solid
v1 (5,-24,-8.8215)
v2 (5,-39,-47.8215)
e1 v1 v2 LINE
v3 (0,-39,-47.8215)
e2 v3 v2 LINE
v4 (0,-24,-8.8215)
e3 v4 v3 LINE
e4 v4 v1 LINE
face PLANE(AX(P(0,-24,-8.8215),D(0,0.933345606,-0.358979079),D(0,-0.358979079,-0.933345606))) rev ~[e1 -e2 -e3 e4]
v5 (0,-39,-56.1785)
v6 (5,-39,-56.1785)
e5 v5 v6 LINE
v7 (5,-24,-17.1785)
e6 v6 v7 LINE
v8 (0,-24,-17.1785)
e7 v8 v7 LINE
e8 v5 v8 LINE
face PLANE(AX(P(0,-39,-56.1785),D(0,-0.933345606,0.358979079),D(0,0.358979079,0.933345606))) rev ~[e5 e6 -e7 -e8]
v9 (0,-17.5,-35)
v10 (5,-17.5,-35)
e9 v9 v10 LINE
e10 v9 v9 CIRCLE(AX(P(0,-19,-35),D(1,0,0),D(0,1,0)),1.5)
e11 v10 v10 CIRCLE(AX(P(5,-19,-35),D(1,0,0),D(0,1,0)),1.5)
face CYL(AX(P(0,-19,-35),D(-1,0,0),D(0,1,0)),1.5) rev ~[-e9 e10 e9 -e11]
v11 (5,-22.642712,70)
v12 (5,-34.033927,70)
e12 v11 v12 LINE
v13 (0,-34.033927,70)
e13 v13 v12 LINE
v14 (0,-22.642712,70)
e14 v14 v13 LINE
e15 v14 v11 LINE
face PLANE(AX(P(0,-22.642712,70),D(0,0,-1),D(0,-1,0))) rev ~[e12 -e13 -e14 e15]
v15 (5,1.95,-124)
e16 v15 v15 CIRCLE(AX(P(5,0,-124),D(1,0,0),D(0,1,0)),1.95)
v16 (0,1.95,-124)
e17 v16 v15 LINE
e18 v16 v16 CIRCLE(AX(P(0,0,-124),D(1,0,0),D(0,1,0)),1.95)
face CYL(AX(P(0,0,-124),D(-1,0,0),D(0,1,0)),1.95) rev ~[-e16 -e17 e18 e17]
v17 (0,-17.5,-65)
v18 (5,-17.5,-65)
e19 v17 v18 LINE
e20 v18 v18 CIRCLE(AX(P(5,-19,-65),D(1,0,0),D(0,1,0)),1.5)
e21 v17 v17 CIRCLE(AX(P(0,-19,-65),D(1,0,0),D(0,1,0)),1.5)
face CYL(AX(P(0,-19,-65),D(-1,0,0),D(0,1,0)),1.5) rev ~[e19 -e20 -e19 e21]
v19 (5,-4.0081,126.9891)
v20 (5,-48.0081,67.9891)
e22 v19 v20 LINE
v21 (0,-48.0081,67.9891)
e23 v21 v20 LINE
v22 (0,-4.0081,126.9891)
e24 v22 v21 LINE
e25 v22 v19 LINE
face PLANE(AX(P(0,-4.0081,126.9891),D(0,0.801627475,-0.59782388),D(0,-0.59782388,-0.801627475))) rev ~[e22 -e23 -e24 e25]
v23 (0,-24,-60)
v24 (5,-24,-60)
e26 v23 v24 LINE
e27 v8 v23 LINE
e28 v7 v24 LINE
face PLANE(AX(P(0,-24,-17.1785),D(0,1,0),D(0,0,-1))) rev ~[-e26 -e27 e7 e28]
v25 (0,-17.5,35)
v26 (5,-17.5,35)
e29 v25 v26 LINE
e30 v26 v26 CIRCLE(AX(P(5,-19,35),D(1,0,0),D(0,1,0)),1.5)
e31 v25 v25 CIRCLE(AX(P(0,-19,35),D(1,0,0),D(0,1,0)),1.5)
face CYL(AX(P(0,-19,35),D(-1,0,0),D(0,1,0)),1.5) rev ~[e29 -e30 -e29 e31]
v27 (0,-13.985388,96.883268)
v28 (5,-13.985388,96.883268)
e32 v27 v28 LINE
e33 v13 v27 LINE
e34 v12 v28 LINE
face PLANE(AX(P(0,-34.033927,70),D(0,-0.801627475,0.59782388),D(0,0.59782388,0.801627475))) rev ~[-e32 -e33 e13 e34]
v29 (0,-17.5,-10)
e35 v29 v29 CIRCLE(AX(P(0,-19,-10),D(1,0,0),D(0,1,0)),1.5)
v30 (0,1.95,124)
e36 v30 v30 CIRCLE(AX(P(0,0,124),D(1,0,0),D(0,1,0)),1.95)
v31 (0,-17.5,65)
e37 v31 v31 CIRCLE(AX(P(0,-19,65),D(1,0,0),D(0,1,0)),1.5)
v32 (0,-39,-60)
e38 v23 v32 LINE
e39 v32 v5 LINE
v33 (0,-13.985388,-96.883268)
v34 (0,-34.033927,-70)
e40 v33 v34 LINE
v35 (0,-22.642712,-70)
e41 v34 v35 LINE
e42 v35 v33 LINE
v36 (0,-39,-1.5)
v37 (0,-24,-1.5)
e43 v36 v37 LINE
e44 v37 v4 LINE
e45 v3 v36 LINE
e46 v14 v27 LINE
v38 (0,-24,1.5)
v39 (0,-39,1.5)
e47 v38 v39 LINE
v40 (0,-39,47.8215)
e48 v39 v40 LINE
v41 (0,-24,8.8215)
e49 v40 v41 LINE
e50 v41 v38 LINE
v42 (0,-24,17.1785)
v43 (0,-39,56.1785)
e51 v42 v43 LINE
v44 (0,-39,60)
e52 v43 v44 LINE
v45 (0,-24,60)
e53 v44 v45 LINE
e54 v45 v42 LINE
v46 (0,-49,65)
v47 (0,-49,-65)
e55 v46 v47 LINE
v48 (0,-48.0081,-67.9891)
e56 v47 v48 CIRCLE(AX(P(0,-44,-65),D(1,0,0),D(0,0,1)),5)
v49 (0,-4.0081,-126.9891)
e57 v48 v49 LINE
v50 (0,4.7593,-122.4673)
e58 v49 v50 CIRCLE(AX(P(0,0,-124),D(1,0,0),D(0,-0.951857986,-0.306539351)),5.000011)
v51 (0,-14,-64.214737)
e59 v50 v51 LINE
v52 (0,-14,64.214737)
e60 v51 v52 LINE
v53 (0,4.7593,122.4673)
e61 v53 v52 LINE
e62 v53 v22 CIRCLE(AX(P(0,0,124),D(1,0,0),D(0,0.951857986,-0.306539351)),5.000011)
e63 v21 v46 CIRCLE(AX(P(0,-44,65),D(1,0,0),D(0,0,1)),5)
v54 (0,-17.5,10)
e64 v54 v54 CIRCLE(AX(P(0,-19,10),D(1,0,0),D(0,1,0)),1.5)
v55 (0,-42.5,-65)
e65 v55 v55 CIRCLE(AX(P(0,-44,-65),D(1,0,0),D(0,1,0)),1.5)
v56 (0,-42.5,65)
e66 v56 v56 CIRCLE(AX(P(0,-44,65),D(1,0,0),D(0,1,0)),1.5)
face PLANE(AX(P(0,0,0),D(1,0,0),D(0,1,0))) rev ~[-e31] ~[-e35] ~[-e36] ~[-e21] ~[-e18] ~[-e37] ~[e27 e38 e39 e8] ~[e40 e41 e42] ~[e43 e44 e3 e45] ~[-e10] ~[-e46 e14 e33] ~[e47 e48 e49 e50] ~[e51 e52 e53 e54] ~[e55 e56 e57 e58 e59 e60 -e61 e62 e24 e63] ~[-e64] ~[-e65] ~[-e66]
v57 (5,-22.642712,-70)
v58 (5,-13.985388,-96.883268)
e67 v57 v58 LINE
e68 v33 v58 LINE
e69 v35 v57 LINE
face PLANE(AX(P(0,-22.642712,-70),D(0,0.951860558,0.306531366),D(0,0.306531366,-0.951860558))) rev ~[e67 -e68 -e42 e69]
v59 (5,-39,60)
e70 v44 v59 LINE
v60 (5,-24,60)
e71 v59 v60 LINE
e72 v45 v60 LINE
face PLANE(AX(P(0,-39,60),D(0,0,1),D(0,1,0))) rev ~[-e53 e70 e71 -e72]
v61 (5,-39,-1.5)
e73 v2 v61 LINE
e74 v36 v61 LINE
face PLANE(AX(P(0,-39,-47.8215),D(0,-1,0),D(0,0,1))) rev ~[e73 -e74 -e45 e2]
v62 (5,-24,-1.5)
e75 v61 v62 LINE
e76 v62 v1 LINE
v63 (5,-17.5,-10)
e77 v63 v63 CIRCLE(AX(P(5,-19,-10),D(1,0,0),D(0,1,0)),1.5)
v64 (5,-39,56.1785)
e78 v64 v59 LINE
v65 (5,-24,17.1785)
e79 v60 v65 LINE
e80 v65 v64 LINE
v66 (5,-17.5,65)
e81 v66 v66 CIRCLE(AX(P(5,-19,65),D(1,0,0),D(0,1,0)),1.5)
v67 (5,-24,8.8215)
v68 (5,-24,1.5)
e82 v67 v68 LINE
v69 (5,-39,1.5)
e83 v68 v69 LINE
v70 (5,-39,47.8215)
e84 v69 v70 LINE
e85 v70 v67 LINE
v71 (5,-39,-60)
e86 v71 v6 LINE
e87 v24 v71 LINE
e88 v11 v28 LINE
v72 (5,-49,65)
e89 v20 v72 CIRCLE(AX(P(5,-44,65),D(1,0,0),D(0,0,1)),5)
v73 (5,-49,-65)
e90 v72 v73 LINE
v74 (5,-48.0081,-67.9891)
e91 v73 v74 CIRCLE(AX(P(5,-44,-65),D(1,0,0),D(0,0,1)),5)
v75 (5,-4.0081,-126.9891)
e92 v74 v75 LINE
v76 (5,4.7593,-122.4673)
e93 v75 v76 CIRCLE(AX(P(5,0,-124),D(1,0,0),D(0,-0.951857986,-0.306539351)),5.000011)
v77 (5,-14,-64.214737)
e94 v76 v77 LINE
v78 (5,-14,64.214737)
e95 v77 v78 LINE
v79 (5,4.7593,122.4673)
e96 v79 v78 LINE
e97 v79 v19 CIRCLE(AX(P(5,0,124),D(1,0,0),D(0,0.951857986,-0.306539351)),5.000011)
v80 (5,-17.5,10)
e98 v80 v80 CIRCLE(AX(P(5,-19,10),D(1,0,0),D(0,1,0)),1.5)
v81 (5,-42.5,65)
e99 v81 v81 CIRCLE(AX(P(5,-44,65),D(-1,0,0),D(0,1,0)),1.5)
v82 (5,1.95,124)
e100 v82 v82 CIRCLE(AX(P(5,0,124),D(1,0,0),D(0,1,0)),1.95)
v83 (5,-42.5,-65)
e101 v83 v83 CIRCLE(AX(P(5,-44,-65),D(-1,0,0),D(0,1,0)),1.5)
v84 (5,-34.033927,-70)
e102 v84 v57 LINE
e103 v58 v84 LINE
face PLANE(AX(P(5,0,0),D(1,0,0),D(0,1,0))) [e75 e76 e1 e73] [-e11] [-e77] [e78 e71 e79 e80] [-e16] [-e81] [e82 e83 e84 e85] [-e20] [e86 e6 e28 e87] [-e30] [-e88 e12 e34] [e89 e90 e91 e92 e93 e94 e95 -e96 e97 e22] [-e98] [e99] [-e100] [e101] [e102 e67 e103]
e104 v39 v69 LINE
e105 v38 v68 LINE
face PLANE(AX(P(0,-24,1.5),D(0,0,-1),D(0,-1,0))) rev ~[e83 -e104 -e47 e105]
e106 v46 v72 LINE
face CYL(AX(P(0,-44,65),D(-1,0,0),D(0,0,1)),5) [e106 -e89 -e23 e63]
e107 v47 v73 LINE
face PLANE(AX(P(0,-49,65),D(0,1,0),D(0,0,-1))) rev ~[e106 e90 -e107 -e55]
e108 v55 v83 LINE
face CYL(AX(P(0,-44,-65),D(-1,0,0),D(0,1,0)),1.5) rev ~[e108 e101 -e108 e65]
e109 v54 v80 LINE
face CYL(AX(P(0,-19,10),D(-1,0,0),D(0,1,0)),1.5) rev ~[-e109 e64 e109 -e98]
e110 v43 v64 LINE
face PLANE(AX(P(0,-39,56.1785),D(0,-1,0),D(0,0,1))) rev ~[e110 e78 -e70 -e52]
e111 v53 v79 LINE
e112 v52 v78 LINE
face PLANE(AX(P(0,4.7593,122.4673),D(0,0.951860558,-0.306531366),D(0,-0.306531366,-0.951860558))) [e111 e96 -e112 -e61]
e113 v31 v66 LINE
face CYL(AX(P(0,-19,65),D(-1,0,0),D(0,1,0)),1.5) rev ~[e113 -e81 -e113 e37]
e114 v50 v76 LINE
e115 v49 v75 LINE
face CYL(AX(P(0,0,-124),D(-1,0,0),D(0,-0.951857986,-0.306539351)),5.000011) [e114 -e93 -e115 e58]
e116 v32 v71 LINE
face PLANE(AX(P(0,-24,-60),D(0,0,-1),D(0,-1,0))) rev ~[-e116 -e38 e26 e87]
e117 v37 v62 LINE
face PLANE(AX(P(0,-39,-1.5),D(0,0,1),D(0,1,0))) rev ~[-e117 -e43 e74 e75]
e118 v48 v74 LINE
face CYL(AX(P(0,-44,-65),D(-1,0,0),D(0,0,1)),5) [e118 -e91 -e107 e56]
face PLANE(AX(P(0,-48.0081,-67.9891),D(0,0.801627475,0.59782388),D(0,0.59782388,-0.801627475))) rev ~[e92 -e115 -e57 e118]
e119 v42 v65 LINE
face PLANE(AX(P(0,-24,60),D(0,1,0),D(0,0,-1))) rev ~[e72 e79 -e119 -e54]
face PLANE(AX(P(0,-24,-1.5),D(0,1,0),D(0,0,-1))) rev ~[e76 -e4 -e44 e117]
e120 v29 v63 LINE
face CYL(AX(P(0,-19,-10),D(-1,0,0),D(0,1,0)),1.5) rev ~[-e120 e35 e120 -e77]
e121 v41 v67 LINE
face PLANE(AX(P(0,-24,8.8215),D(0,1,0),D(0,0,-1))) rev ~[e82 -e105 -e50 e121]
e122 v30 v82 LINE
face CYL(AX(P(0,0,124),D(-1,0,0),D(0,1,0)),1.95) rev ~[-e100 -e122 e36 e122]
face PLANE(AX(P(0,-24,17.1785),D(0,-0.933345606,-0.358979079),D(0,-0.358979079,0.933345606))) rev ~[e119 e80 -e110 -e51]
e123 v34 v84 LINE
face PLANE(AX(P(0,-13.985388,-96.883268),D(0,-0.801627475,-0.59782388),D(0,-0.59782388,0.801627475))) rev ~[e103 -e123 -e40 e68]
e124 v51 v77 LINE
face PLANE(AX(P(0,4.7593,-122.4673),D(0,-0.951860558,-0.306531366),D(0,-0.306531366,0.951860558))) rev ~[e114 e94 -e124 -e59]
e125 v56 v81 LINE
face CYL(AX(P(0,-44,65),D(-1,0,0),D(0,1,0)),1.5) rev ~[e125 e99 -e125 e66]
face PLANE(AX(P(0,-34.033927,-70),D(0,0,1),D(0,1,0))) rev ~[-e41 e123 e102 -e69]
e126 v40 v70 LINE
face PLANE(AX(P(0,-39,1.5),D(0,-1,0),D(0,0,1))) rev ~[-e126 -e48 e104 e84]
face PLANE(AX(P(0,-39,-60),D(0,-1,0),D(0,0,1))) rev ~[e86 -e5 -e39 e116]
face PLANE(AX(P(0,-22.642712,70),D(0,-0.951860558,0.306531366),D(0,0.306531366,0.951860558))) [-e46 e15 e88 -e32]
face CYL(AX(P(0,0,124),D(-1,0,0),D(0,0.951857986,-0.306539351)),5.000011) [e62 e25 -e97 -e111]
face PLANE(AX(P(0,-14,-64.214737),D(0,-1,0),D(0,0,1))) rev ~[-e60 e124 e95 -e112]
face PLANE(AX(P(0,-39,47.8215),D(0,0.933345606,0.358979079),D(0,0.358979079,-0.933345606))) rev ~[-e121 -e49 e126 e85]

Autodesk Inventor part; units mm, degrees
ref_plane "YZ Plane" through (0, 0, 0) normal (1, 0, 0) x (0, 1, 0)
ref_plane "XZ Plane" through (0, 0, 0) normal (0, 1, 0) x (-1, 0, 0)
sketch "Sketch1" plane through (0, 0, 0) normal (1, 0, 0) x (0, 1, 0)
  circle A0 centre (0, -124) radius 1.95
  circle A1 centre (0, 124) radius 1.95
  circle A2 centre (-19, -65) radius 1.5
  circle A3 centre (-19, 65) radius 1.5
  line L0 (0, 124) -> (-19, 65) construction
  line L1 (4.7593, 122.4673) -> (-14.2407, 63.4673)
  line L2 (-23.7593, 66.5327) -> (-4.7593, 125.5327)
  arc A4 (4.7593, 122.4673) -> (-4.7593, 125.5327) centre (0, 124) ccw
  arc A5 (-23.7593, 66.5327) -> (-14.2407, 63.4673) centre (-19, 65) ccw
  line L3 (-19, 65) -> (-19, -65) construction
  line L4 (-24, 65) -> (-24, -65)
  line L5 (-14, -65) -> (-14, 65)
  arc A6 (-14, 65) -> (-24, 65) centre (-19, 65) ccw
  arc A7 (-24, -65) -> (-14, -65) centre (-19, -65) ccw
  line L6 (-19, -65) -> (0, -124) construction
  line L7 (-23.7593, -66.5327) -> (-4.7593, -125.5327)
  line L8 (4.7593, -122.4673) -> (-14.2407, -63.4673)
  arc A8 (-14.2407, -63.4673) -> (-23.7593, -66.5327) centre (-19, -65) ccw
  arc A9 (-4.7593, -125.5327) -> (4.7593, -122.4673) centre (0, -124) ccw
  circle A10 centre (-44, 65) radius 1.5
  circle A11 centre (-44, -65) radius 1.5
  line L9 (-19, 65) -> (-44, 65) construction
  line L10 (-19, 70) -> (-44, 70)
  line L11 (-44, 60) -> (-19, 60)
  arc A12 (-19, 60) -> (-19, 70) centre (-19, 65) ccw
  arc A13 (-44, 70) -> (-44, 60) centre (-44, 65) ccw
  line L12 (-19, -65) -> (-44, -65) construction
  line L13 (-19, -60) -> (-44, -60)
  line L14 (-44, -70) -> (-19, -70)
  arc A14 (-19, -70) -> (-19, -60) centre (-19, -65) ccw
  arc A15 (-44, -60) -> (-44, -70) centre (-44, -65) ccw
  line L15 (0, 124) -> (-44, 65) construction
  line L16 (-4.0081, 126.9891) -> (-48.0081, 67.9891)
  line L17 (-39.9919, 62.0109) -> (4.0081, 121.0109)
  arc A16 (4.0081, 121.0109) -> (-4.0081, 126.9891) centre (0, 124) ccw
  arc A17 (-48.0081, 67.9891) -> (-39.9919, 62.0109) centre (-44, 65) ccw
  line L18 (-44, -65) -> (0, -124) construction
  line L19 (-48.0081, -67.9891) -> (-4.0081, -126.9891)
  line L20 (4.0081, -121.0109) -> (-39.9919, -62.0109)
  arc A18 (-39.9919, -62.0109) -> (-48.0081, -67.9891) centre (-44, -65) ccw
  arc A19 (-4.0081, -126.9891) -> (4.0081, -121.0109) centre (0, -124) ccw
  line L21 (-44, 65) -> (-44, -65) construction
  line L22 (-49, 65) -> (-49, -65)
  line L23 (-39, -65) -> (-39, 65)
  arc A20 (-39, 65) -> (-49, 65) centre (-44, 65) ccw
  arc A21 (-49, -65) -> (-39, -65) centre (-44, -65) ccw
  line L24 (-44, 65) -> (-19, 0) construction
  line L25 (-45.4, 64.4615) -> (-20.4, -0.5385)
  line L26 (-17.6, 0.5385) -> (-42.6, 65.5385)
  arc A22 (-42.6, 65.5385) -> (-45.4, 64.4615) centre (-44, 65) ccw
  arc A23 (-20.4, -0.5385) -> (-17.6, 0.5385) centre (-19, 0) ccw
  line L27 (-44, -65) -> (-19, 0) construction
  line L28 (-42.6, -65.5385) -> (-17.6, -0.5385)
  line L29 (-20.4, 0.5385) -> (-45.4, -64.4615)
  arc A24 (-45.4, -64.4615) -> (-42.6, -65.5385) centre (-44, -65) ccw
  arc A25 (-17.6, -0.5385) -> (-20.4, 0.5385) centre (-19, 0) ccw
  line L30 (-19, 0) -> (-44, 0) construction
  line L31 (-19, 1.5) -> (-44, 1.5)
  line L32 (-44, -1.5) -> (-19, -1.5)
  arc A26 (-19, -1.5) -> (-19, 1.5) centre (-19, 0) ccw
  arc A27 (-44, 1.5) -> (-44, -1.5) centre (-44, 0) ccw
  circle A28 centre (-19, -10) radius 1.5
  circle A29 centre (-19, -35) radius 1.5
  circle A30 centre (-19, 10) radius 1.5
  circle A31 centre (-19, 35) radius 1.5
  point P0 (0, 0)
  point P1 (-9.5, 94.5)
  point P2 (-9.5, -94.5)
  point P3 (-14, -64.2148)
  point P4 (-14, 64.2148)
  point P5 (-24, 65)
  point P6 (-31.5, 65)
  point P7 (-31.5, -65)
  point P8 (-22, 94.5)
  point P9 (-22, -94.5)
  point P10 (-44, 0)
  point P11 (-31.5, 32.5)
  point P12 (-31.5, -32.5)
  point P13 (-39, 47.8215)
  point P14 (-24, 8.8215)
  point P15 (-24, 17.1785)
  point P16 (-40.4698, 60)
  point P17 (-24, 60)
  point P18 (-22.6427, 70)
  point P19 (-34.0339, 70)
  point P20 (-13.9854, 96.8832)
  point P21 (-6.8749, 118.9633)
  point P22 (-43.3898, 70)
  point P23 (-49, 65)
  point P24 (-43.3898, -70)
  point P25 (-6.8749, -118.9633)
  point P26 (-13.9854, -96.8832)
  point P27 (-34.0339, -70)
  point P28 (-22.6427, -70)
  point P29 (-24, -60)
  point P30 (-40.4698, -60)
  point P31 (-24, -17.1785)
  point P32 (-24, -8.8215)
  point P33 (-39, -47.8215)
  point P34 (-31.5, 0)
  point P35 (-39, -1.5)
  point P36 (-24, -1.5)
  point P37 (-24, 1.5)
  point P38 (-39, 1.5)
  point P39 (-49, 65)
  point P40 (-4.0081, -126.9891)
  point P41 (-39, 60)
  point P42 (-39, -60)
  point P43 (-39, -56.1785)
  point P44 (-39, 56.1785)
  dimension "d2" = 3.9
  dimension "d4" = 3.9
  dimension "d25" = 3
  dimension "d28" = 3
  dimension "d43" = 59
  dimension "d44" = 65
  dimension "d45" = 65
  dimension "d47" = 59
  dimension "d48" = 10
  dimension "d49" = 10
  dimension "d50" = 10
  dimension "d52" = 14
  dimension "d53" = 3
  dimension "d54" = 3
  dimension "d55" = 10
  dimension "d56" = 10
  dimension "d57" = 25
  dimension "d58" = 25
  dimension "d59" = 10
  dimension "d60" = 10
  dimension "d61" = 10
  dimension "d62" = 3
  dimension "d63" = 3
  dimension "d64" = 3
  dimension "d65" = 3
  dimension "d66" = 3
  dimension "d67" = 10
  dimension "d68" = 25
  dimension "d69" = 3
  dimension "d70" = 3
  dimension "d71" = 10
  dimension "d72" = 25
extrude "Extrusion1" add sketch "Sketch1" along normal blind 5 contours A16 L17 L2 A4 | L1 L5 A6 L10 L2 L17 A16 | L5 L8 A8 L13 L4 L28 A23 L26 L11 A5 L1 | L1 A12 L5 | A4 L2 L17 L10 A13 L16 | A5 A6 A12 | L8 A19 L20 L7 L14 A7 L5 | L5 A14 L8 | A13 A20 L23 L17 A17 L26 A10 L25 | L11 L4 A5 | A7 A8 A14 | A9 L7 L20 A19 | A6 L2 L10 | L10 L17 L23 A20 | A13 L11 L25 L23 L31 A27 L32 L29 L13 A15 L22 | L2 A5 L4 L11 L23 L17 L10 | L14 L7 A7 | L19 A15 L14 L20 L7 A9 | A8 L4 L13 | A17 L25 L11 | A15 A18 L29 A11 L28 L20 L23 A21 | L23 L11 L26 A17 L17 | L26 A25 L31 L25 L4 | L4 L25 L23 L26 | L23 L26 L11 | L7 L14 L20 L23 L13 L4 A7 | L25 A17 L26 L11 | L11 L26 L23 L25 | L25 A10 L26 A17 | L13 L29 A18 | L25 L31 L4 | A23 L25 L29 A25 | L14 A21 L23 L20 | L28 L23 L29 L4 | L4 L29 L32 A23 L28 | L23 L20 A18 L28 L13 | L13 L28 L23 | L29 L23 L28 L13 | L13 L28 A18 L29 | A18 L28 A11 L29 | L31 L25 L29 L32 L4 | L4 L32 L23 L31 | L31 A25 L29 L25 | L4 L32 L29 | L23 L32 A27 L31 | L25 A23 L32 L29
sketch "Sketch7" plane through (5, 0, 0) normal (1, 0, 0) x (0, 0, -1)
  circle A0 centre (-65, -19) radius 1.5 projected
  circle A1 centre (-35, -19) radius 1.5 projected
  circle A2 centre (-10, -19) radius 1.5 projected
  circle A3 centre (35, -19) radius 1.5 projected
  circle A4 centre (10, -19) radius 1.5 projected
  circle A5 centre (65, -19) radius 1.5 projected
  circle A6 centre (124, 0) radius 1.95 projected
  line L0 (-17.1785, -24) -> (-56.1785, -39) projected
  line L1 (-56.1785, -39) -> (-60, -39) projected
  line L2 (-60, -39) -> (-60, -24) projected
  line L3 (-60, -24) -> (-17.1785, -24) projected
  circle A7 centre (65, -44) radius 1.5 projected
  circle A8 centre (-65, -44) radius 1.5 projected
  line L4 (-96.8832, -13.9854) -> (-70, -22.6427) projected
  line L5 (-70, -22.6427) -> (-70, -34.0339) projected
  line L6 (-70, -34.0339) -> (-96.8832, -13.9854) projected
  line L7 (-1.5, -39) -> (-47.8215, -39) projected
  line L8 (-47.8215, -39) -> (-8.8215, -24) projected
  line L9 (-8.8215, -24) -> (-1.5, -24) projected
  line L10 (-1.5, -24) -> (-1.5, -39) projected
  line L11 (8.8215, -24) -> (47.8215, -39) projected
  line L12 (47.8215, -39) -> (1.5, -39) projected
  line L13 (1.5, -39) -> (1.5, -24) projected
  line L14 (1.5, -24) -> (8.8215, -24) projected
  line L15 (60, -24) -> (60, -39) projected
  line L16 (60, -39) -> (56.1785, -39) projected
  line L17 (56.1785, -39) -> (17.1785, -24) projected
  line L18 (17.1785, -24) -> (60, -24) projected
  line L19 (96.8832, -13.9854) -> (70, -34.0339) projected
  line L20 (70, -34.0339) -> (70, -22.6427) projected
  line L21 (70, -22.6427) -> (96.8832, -13.9854) projected
  arc A9 (126.9891, -4.0081) -> (122.4673, 4.7593) centre (124, 0) ccw projected
  line L22 (122.4673, 4.7593) -> (64.2148, -14) projected
  line L23 (64.2148, -14) -> (-64.2148, -14) projected
  line L24 (-64.2148, -14) -> (-122.4673, 4.7593) projected
  arc A10 (-122.4673, 4.7593) -> (-126.9891, -4.0081) centre (-124, 0) ccw projected
  line L25 (-126.9891, -4.0081) -> (-67.9891, -48.0081) projected
  arc A11 (-67.9891, -48.0081) -> (-65, -49) centre (-65, -44) ccw projected
  line L26 (-65, -49) -> (65, -49) projected
  arc A12 (65, -49) -> (67.9891, -48.0081) centre (65, -44) ccw projected
  line L27 (67.9891, -48.0081) -> (126.9891, -4.0081) projected
  circle A13 centre (-124, 0) radius 1.95 projected
  point P0 (0, 0)
properties part number "Horizontal_bar_V2"
